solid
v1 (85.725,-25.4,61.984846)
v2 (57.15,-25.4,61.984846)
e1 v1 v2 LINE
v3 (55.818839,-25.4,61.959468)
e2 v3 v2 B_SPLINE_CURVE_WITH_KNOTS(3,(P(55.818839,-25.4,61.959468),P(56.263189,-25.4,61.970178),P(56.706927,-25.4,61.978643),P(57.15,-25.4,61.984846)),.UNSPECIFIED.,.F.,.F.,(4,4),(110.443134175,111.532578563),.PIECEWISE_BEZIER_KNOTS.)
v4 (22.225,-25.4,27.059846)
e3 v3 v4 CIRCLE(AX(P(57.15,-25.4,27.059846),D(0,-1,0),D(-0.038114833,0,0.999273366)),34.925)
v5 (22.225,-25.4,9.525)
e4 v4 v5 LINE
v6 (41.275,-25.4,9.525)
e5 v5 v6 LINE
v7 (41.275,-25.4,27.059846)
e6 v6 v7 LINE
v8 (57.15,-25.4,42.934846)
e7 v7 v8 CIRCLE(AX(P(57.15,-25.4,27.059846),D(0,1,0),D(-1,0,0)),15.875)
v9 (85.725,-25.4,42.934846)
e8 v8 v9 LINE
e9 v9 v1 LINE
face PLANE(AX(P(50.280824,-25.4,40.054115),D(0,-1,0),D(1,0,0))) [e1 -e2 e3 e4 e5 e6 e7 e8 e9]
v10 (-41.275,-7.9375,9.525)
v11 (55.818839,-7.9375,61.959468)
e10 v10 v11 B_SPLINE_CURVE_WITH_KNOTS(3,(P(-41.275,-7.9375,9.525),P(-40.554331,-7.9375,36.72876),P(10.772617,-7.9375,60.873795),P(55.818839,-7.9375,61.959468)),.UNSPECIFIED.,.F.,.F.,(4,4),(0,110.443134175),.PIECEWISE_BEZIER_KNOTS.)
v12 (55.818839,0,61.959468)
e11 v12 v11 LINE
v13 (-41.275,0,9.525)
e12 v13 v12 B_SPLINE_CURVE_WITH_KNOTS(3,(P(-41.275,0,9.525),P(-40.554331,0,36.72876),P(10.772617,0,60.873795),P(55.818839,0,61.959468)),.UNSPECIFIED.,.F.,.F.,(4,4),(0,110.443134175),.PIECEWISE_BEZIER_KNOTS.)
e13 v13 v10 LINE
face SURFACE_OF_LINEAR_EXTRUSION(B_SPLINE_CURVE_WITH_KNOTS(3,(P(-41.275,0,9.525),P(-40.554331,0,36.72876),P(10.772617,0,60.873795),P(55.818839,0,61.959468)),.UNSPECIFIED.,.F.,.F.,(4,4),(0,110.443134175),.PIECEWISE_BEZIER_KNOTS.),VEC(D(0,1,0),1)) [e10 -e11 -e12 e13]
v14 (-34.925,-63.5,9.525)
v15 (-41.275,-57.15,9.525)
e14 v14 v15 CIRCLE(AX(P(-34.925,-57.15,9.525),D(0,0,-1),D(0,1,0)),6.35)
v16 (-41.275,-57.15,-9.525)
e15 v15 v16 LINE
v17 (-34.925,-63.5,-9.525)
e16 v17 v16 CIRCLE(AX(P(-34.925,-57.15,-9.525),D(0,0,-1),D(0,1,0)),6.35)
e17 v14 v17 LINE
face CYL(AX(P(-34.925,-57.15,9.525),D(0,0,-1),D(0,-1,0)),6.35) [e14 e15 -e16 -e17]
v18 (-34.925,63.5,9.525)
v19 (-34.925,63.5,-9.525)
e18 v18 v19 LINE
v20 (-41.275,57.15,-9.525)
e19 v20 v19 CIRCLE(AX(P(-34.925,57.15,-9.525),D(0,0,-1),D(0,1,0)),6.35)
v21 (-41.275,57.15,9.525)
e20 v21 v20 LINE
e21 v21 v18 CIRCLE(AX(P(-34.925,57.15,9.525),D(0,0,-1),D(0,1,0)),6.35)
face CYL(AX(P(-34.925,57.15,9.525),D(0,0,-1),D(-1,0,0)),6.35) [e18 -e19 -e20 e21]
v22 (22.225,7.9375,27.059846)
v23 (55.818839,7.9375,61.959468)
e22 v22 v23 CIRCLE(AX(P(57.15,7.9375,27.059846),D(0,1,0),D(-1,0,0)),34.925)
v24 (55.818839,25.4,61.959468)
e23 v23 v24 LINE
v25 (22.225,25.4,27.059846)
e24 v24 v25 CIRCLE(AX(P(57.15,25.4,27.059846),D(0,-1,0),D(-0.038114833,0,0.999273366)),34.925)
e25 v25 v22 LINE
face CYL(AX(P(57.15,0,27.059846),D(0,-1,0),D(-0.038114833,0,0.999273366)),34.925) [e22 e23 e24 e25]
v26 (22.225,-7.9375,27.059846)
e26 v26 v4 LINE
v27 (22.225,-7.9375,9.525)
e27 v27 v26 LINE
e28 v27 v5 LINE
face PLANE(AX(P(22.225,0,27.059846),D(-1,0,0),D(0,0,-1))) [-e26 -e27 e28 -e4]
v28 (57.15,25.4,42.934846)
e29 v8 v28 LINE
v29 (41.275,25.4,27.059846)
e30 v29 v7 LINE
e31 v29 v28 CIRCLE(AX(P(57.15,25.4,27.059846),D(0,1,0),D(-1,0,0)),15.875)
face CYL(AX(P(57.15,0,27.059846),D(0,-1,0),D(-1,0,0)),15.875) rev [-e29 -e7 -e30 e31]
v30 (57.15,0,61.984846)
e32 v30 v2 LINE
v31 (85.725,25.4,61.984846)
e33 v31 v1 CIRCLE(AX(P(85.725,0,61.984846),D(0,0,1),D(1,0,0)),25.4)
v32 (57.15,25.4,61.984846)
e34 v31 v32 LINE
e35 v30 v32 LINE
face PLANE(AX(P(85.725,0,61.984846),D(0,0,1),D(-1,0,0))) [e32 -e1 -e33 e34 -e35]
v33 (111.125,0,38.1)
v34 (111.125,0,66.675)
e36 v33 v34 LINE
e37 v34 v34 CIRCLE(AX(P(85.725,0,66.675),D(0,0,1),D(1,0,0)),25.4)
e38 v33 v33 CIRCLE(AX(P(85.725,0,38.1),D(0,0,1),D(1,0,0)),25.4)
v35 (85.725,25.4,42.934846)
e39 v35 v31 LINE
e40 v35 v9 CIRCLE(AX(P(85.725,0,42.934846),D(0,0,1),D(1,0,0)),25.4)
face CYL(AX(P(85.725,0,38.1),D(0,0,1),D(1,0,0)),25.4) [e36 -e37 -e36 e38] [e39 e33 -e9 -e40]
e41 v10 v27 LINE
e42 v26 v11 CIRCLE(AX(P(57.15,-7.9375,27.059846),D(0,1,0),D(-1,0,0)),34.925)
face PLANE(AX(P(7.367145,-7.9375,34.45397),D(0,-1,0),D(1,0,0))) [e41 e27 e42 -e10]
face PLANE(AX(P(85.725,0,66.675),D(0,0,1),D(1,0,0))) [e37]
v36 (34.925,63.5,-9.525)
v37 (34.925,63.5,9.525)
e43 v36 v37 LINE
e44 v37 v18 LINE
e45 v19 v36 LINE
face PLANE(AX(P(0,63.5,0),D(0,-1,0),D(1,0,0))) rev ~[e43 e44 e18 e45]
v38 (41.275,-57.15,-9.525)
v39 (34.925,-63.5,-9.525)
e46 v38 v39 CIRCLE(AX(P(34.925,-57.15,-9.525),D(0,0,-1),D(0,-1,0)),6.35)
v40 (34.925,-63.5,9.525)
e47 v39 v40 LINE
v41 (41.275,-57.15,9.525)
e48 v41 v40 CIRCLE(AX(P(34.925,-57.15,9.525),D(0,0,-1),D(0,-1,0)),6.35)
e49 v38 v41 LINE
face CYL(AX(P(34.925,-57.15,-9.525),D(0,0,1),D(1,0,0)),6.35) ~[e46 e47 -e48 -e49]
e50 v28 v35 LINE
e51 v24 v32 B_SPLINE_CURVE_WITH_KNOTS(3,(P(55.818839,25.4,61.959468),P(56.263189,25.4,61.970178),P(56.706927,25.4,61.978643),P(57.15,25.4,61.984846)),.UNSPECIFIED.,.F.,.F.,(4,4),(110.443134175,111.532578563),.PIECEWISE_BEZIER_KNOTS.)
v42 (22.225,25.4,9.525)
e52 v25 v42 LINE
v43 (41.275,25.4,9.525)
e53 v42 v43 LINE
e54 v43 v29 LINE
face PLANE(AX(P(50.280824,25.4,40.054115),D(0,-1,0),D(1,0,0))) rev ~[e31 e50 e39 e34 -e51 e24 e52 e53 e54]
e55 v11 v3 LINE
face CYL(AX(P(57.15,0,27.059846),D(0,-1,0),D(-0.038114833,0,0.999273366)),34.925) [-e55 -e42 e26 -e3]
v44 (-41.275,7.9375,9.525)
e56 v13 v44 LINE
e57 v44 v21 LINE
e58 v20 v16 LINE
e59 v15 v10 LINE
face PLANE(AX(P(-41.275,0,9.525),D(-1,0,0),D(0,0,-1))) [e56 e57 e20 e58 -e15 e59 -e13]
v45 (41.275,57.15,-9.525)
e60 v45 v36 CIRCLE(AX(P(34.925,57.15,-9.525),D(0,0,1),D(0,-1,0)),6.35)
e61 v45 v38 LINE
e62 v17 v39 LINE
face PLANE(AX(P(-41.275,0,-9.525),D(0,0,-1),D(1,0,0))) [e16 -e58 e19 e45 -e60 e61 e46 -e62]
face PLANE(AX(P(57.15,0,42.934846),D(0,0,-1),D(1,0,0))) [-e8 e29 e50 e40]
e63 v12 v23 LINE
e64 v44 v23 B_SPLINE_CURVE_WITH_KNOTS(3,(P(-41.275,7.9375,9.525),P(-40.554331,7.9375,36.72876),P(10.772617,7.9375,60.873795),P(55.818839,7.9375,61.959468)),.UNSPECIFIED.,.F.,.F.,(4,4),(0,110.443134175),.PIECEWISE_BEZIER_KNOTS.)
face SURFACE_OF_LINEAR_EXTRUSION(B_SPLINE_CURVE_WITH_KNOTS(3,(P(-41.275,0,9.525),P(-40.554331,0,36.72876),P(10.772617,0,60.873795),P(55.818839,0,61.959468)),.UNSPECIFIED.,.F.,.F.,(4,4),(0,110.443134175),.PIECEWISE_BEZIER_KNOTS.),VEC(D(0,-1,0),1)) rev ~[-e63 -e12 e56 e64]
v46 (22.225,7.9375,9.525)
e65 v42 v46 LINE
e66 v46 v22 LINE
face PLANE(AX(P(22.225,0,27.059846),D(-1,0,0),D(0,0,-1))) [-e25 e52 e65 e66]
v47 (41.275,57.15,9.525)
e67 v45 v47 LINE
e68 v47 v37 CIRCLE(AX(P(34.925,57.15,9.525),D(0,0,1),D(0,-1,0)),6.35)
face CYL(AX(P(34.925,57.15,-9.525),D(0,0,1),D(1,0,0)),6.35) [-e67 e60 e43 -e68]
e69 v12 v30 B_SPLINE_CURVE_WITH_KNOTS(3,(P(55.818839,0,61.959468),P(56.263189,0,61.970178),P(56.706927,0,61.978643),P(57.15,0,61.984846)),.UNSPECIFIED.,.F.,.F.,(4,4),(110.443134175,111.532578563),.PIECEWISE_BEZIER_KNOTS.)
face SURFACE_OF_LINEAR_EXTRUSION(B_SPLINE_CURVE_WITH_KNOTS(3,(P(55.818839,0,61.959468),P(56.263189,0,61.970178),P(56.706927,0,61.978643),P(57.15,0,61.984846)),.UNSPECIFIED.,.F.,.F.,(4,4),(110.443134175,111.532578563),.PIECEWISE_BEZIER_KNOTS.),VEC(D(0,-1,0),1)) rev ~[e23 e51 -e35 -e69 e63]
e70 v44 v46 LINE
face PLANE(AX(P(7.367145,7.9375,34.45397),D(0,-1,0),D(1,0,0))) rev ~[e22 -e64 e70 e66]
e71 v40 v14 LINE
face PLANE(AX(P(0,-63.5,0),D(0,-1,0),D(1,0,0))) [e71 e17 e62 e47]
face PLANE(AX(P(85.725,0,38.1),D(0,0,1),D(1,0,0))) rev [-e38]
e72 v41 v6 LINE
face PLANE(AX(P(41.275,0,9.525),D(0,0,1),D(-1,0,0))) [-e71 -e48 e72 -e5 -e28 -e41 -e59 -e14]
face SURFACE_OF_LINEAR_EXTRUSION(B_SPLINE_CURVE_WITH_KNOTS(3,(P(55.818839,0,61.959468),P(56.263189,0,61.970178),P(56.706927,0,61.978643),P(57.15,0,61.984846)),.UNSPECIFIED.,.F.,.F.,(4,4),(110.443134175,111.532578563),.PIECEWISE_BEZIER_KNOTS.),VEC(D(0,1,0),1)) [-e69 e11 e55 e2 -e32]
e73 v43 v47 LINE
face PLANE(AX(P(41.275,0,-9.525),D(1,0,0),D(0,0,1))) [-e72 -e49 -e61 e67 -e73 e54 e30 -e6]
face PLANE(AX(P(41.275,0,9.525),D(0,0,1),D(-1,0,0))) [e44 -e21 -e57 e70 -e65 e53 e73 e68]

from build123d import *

# Parameters (mm, degrees)
F1_DEPTH = 63.5
F2_DEPTH = 25.4
F3_DEPTH = 7.9375
F5_R     = 6.35


# Not quite as in the source:
# - a feature names something its author has since deleted; it is built from what else it names


with BuildPart() as f1:
    # F0 (on Front) → F1 (new body, symmetric)
    with BuildSketch(Plane.XZ):
        Polygon((22.225, 9.525), (-41.275, 9.525), (-41.275, -9.525), (41.275, -9.525), (41.275, 9.525), align=None)
    extrude(amount=F1_DEPTH, both=True)

    # F0 (on Front) → F2 (join, symmetric)
    with BuildSketch(Plane.XZ):
        with BuildLine():
            Line((85.725, 61.9848461288), (60.325, 61.9848461288))
            Line((60.325, 61.9848461288), (57.15, 61.9848461288))
            add(Edge.make_bspline(
                [(55.8188394438, 61.9594684272), (56.2631889725, 61.9701778386), (56.7069273587, 61.9786434716), (57.15, 61.9848461288)],
                knots=[110.4431341751, 110.4431341751, 110.4431341751, 110.4431341751, 111.5325785628, 111.5325785628, 111.5325785628, 111.5325785628], degree=3))
            ThreePointArc((55.8188394438, 61.9594684272), (31.9880604143, 51.2803420215), (22.225, 27.0598461288))
            Line((22.225, 27.0598461288), (22.225, 9.525))
            Line((22.225, 9.525), (41.275, 9.525))
            Line((41.275, 9.525), (41.275, 27.0598461288))
            ThreePointArc((41.275, 27.0598461288), (45.9246798487, 38.2851662801), (57.15, 42.9348461288))
            Line((57.15, 42.9348461288), (60.325, 42.9348461288))
            Line((60.325, 42.9348461288), (85.725, 42.9348461288))
            Line((85.725, 42.9348461288), (85.725, 61.9848461288))
        make_face()
    extrude(amount=F2_DEPTH, both=True)

    # F0 (on Front) → F3 (join, symmetric)
    with BuildSketch(Plane.XZ):
        with BuildLine():
            ThreePointArc((22.225, 27.0598461288), (31.9880604143, 51.2803420215), (55.8188394438, 61.9594684272))
            add(Edge.make_bspline(
                [(-41.275, 9.525), (-40.5543307974, 36.728759834), (10.7726166473, 60.8737948733), (55.8188394438, 61.9594684272)],
                knots=[0, 0, 0, 0, 110.4431341751, 110.4431341751, 110.4431341751, 110.4431341751], degree=3))
            Line((-41.275, 9.525), (22.225, 9.525))
            Line((22.225, 9.525), (22.225, 27.0598461288))
        make_face()
    extrude(amount=F3_DEPTH, both=True)

    # F0 (on Front) → F4 (revolve)
    with BuildSketch(Plane.XZ):
        Polygon((111.125, 66.675), (85.725, 66.675), (85.725, 61.9848461288), (85.725, 42.9348461288), (85.725, 38.1), (111.125, 38.1), align=None)
    revolve(axis=Axis((85.725, 0, 52.3875), (0, 0, 1)))

    # F5
    f5_edges = [f1.edges().sort_by_distance(p)[0] for p in [
        (41.275, -63.5, 0),
        (-41.275, -63.5, 0),
        (-41.275, 63.5, 0),
        (41.275, 63.5, 0),
    ]]
    fillet(f5_edges, radius=F5_R)


solid = f1.part
